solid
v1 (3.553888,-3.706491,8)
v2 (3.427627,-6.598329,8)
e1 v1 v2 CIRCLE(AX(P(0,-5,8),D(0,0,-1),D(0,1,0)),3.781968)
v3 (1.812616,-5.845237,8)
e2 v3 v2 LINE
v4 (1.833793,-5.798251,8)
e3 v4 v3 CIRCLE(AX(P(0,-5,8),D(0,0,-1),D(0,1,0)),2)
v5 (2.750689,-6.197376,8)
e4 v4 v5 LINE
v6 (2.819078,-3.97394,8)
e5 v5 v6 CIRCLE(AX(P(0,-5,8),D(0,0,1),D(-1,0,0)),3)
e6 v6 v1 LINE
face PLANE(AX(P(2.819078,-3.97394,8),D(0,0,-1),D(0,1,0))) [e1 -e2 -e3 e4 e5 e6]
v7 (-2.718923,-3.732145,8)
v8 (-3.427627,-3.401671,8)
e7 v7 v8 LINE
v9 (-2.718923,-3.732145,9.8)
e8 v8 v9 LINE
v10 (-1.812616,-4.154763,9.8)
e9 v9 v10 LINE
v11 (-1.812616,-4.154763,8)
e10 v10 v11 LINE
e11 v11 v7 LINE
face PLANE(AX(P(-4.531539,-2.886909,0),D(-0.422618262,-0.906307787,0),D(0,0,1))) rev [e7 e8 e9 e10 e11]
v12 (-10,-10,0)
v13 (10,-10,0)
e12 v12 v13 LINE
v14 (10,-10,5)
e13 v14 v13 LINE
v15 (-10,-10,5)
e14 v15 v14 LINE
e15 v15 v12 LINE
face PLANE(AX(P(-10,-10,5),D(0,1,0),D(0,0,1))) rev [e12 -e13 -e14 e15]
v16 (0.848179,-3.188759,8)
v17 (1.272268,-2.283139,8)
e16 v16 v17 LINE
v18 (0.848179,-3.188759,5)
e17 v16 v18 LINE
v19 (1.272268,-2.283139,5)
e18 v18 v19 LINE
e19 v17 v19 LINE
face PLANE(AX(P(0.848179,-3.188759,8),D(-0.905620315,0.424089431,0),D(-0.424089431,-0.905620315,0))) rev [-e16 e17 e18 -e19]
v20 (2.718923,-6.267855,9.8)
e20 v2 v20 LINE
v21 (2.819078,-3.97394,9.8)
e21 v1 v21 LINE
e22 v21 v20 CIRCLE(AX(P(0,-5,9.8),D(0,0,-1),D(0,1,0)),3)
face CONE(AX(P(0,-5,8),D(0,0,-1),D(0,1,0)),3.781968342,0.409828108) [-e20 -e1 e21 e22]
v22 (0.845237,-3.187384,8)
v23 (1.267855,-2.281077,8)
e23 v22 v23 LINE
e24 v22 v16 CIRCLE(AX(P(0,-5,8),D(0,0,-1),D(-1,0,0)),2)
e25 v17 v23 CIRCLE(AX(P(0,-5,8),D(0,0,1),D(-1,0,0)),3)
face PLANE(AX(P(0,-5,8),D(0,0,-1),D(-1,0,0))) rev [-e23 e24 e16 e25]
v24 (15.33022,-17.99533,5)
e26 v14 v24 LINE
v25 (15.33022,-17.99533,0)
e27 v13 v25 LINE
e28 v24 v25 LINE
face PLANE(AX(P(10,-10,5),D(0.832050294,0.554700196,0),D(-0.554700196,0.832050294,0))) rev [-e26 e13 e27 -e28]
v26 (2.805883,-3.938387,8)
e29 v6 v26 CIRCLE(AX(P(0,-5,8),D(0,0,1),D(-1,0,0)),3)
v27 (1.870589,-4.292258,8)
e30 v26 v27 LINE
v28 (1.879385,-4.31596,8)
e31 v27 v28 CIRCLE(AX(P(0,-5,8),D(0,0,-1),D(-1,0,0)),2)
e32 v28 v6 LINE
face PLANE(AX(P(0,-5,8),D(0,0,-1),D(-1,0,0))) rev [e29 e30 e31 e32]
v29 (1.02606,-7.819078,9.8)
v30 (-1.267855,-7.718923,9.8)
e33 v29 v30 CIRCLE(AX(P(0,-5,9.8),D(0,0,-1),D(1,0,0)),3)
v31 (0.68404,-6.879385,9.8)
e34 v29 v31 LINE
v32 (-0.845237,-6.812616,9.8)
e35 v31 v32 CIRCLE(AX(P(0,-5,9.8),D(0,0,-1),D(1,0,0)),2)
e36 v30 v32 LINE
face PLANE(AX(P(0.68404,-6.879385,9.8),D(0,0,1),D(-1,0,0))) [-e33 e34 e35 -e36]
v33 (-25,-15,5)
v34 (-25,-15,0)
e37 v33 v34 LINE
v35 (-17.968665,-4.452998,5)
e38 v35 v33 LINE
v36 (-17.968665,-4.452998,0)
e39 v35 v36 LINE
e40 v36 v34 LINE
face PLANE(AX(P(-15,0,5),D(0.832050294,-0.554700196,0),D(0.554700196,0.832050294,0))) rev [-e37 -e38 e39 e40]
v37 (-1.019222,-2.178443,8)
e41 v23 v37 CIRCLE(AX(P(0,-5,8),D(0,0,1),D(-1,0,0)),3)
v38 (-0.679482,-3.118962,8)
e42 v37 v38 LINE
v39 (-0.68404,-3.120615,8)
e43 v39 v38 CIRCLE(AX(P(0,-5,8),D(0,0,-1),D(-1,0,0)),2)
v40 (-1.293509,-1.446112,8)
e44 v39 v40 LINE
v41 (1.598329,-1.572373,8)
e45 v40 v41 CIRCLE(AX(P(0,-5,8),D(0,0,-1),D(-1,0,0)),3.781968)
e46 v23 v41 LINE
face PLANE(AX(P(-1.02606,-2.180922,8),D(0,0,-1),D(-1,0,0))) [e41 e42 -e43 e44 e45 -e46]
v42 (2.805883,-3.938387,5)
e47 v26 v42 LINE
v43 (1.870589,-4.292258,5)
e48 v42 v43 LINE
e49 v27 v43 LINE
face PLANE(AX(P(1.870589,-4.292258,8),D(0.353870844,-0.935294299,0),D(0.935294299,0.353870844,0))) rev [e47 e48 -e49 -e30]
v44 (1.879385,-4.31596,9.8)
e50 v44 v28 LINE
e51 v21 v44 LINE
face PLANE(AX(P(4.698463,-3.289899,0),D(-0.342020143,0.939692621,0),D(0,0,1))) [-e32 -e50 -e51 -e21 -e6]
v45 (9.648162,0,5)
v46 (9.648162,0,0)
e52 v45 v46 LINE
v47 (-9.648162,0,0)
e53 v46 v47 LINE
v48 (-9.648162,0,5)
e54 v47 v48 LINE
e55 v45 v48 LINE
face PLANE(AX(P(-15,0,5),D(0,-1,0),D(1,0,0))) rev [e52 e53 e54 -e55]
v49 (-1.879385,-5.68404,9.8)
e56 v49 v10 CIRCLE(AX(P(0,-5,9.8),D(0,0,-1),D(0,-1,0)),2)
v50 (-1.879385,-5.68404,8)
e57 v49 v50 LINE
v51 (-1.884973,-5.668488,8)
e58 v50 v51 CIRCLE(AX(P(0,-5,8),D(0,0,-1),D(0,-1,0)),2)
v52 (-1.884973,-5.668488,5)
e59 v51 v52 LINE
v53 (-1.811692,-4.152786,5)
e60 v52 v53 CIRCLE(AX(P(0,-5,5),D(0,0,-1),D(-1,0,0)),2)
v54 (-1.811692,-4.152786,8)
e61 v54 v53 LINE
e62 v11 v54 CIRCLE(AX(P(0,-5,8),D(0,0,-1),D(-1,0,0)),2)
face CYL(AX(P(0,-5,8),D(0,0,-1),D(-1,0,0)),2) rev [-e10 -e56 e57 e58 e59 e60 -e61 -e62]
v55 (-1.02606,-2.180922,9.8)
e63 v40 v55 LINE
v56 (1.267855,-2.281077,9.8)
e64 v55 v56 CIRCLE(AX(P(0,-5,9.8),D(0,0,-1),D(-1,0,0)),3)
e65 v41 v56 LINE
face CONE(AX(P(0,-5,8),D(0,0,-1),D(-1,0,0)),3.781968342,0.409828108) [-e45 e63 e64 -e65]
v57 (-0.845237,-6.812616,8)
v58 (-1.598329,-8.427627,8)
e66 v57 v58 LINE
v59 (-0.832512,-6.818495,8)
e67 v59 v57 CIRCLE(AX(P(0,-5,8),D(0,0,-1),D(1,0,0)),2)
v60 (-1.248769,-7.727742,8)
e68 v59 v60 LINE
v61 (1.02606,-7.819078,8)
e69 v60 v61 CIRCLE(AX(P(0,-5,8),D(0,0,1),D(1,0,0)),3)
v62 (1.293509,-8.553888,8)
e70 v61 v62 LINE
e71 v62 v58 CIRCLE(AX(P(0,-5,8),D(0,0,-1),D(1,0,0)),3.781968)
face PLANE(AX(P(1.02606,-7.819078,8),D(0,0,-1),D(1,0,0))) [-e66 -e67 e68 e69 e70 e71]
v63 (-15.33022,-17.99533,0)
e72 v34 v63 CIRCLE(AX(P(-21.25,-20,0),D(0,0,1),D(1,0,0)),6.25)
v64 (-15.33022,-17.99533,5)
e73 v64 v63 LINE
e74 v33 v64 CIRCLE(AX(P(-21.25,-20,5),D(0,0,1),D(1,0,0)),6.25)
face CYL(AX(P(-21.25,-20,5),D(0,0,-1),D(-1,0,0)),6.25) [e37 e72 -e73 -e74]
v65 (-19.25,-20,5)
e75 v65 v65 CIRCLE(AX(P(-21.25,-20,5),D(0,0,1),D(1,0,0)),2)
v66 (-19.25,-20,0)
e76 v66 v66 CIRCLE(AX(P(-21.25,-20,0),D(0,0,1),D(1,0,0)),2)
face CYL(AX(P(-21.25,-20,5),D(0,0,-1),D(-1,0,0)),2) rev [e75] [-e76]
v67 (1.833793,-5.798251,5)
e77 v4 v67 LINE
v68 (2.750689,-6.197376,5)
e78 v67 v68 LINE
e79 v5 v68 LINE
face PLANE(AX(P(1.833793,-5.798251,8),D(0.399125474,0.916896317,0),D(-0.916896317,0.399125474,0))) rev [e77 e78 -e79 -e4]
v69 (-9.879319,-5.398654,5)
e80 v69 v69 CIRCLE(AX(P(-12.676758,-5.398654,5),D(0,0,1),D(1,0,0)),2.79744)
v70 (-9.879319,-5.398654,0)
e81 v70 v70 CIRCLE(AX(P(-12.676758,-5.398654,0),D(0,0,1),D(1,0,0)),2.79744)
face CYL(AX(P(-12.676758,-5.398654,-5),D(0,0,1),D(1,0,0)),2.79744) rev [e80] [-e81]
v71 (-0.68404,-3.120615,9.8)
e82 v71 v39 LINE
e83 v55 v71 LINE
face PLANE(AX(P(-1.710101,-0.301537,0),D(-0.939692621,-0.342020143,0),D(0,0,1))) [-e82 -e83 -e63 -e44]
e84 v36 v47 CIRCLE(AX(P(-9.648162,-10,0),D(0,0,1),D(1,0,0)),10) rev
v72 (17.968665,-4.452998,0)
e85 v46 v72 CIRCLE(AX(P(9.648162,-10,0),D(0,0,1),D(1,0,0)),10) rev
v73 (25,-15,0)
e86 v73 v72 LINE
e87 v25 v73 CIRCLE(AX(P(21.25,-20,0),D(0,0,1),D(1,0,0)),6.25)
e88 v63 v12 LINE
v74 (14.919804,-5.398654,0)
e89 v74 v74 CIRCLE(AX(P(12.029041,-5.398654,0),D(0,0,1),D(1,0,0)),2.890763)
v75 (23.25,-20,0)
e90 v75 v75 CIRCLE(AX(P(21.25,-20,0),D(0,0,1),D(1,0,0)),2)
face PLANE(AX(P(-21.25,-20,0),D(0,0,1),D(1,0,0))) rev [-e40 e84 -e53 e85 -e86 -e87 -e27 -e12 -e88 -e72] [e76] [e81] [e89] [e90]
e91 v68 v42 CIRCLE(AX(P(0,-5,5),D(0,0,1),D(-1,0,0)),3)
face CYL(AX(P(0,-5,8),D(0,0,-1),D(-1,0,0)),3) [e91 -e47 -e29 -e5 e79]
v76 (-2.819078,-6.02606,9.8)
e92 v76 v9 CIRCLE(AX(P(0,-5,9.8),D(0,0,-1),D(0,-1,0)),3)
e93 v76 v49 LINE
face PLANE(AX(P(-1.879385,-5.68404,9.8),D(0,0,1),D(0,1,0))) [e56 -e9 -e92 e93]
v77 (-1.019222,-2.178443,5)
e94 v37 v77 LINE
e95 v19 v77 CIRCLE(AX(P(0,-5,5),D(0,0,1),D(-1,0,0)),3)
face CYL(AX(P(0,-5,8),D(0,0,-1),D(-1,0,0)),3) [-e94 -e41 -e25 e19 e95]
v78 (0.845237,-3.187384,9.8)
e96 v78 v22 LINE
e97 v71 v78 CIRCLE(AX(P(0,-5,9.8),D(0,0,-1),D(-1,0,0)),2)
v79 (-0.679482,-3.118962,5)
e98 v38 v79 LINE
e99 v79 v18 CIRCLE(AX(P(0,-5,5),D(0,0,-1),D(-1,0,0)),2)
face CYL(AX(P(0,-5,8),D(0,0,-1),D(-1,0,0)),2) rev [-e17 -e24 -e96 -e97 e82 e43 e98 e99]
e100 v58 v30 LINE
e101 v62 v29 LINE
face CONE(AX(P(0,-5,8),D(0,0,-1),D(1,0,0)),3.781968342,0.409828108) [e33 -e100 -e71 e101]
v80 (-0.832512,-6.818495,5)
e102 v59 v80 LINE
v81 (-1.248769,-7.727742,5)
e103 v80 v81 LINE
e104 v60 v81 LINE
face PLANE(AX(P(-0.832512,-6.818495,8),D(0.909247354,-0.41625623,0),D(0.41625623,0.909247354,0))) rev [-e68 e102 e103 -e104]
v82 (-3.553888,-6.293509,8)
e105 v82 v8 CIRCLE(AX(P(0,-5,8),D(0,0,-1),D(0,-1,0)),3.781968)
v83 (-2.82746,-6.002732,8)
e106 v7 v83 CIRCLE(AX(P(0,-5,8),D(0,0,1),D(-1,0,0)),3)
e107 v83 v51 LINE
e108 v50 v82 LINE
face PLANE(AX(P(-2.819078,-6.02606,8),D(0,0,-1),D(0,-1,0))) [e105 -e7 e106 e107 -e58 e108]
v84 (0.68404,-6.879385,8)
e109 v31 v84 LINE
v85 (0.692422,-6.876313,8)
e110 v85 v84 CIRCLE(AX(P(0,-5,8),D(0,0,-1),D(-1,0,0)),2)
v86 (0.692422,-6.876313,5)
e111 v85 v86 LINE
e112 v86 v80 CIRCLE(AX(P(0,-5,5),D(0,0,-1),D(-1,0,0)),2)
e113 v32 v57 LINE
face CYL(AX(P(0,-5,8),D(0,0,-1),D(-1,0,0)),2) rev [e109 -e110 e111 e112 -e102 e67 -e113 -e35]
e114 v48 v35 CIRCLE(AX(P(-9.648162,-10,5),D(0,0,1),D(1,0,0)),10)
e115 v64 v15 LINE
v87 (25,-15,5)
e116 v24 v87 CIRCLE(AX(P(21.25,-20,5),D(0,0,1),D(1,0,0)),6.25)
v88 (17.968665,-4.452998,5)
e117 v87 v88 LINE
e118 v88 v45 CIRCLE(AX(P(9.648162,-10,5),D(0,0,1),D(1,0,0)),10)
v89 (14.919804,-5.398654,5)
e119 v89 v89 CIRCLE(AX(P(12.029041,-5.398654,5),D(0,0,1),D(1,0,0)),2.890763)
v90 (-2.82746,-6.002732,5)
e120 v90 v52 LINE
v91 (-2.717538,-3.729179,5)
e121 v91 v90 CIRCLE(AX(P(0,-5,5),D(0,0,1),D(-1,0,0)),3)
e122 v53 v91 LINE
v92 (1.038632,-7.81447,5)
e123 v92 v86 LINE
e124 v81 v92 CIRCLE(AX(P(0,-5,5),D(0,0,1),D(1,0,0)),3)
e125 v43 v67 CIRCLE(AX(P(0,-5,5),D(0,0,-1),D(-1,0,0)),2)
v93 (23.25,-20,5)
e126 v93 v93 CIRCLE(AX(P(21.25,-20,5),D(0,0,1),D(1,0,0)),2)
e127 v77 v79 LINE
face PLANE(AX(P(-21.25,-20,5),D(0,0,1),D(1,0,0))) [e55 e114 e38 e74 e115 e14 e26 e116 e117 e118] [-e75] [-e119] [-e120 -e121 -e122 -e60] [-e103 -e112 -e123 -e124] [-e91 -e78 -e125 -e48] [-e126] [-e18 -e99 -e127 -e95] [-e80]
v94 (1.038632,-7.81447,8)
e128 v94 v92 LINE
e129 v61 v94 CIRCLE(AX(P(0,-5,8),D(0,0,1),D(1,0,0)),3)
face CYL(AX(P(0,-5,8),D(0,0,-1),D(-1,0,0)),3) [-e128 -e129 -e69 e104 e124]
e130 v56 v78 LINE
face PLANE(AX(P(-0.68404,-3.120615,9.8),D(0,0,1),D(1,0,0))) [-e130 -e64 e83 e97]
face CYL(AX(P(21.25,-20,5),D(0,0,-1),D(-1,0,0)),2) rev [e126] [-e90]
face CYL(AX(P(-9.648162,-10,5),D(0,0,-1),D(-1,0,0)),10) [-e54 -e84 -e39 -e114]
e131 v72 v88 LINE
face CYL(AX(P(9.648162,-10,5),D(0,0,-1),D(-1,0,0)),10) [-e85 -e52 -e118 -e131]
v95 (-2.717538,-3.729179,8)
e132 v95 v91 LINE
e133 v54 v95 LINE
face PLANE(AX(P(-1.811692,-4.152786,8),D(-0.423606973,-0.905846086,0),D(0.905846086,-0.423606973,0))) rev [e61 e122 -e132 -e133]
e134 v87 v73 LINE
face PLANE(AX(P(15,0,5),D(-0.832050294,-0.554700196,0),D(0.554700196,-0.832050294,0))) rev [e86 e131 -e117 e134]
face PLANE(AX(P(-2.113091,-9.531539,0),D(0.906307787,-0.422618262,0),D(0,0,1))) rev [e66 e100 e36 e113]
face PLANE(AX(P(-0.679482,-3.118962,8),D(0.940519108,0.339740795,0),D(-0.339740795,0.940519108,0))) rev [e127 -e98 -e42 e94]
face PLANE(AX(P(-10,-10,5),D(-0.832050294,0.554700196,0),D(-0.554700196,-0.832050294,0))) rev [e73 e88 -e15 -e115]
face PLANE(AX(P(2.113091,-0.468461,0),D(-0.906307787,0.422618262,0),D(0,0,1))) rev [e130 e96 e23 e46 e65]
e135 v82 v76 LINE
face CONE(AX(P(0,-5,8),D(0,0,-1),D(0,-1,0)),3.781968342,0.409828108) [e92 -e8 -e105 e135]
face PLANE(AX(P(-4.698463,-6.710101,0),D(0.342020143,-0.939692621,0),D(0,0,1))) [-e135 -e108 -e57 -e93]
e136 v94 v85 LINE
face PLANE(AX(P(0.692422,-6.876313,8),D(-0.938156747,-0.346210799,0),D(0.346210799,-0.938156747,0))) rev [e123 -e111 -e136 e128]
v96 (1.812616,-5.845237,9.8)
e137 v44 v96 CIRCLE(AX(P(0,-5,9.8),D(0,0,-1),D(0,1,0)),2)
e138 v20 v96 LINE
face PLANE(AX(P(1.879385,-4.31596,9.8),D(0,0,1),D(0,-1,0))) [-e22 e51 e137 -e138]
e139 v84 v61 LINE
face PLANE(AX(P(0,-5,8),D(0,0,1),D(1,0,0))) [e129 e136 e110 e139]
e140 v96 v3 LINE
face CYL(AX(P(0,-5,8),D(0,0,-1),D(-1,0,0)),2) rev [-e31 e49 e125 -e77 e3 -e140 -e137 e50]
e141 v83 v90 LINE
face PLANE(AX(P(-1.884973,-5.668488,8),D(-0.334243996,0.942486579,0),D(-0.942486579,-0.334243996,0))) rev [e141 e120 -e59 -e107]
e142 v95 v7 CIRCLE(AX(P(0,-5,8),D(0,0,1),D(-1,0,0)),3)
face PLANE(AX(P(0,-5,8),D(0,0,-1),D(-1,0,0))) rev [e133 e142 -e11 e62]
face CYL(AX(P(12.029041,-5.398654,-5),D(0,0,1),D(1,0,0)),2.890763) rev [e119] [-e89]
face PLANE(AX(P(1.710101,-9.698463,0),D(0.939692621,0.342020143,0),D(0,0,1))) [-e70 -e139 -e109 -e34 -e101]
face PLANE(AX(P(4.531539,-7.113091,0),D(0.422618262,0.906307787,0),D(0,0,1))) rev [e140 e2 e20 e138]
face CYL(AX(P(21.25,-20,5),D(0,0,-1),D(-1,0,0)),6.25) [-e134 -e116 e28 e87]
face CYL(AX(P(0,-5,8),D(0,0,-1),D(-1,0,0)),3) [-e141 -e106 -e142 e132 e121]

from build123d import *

# Parameters (mm, degrees)
SZKIC1_R                    = 2
DODANIE_WYCI_GNI_CIE1_DEPTH = 5
SZKIC2_R                    = 2.797439786
SZKIC2_R_2                  = 2.890763472
WYTNIJ_WYCI_GNI_CIE1_DEPTH  = 10
ZAOKR_GLENIE1_R             = 10
DODANIE_WYCI_GNI_CIE2_DEPTH = 3
OBR_T1_ANGLE                = 45
SZYK_KO_OWY1_COUNT          = 4


# Read off the part's stored shape, not the designer's step: Obrót1
with BuildPart() as part:
    # Szkic1 → Dodanie-wyciągnięcie1 (new body)
    with BuildSketch(Plane.XY):
        with BuildLine():
            Line((-15, 0), (15, 0))
            Line((15, 0), (25, -15))
            ThreePointArc((25, -15), (23.099320571, -25.970135126), (15.330219835, -17.995329753))
            Line((15.330219835, -17.995329753), (10, -10))
            Line((10, -10), (-10, -10))
            Line((-10, -10), (-15.330219835, -17.995329753))
            ThreePointArc((-15.330219835, -17.995329753), (-23.099320571, -25.970135126), (-25, -15))
            Line((-25, -15), (-15, 0))
        make_face()
        with Locations((-21.25, -20)):
            Circle(SZKIC1_R, mode=Mode.SUBTRACT)
        with Locations((21.25, -20)):
            Circle(SZKIC1_R, mode=Mode.SUBTRACT)
    extrude(amount=DODANIE_WYCI_GNI_CIE1_DEPTH)

    # Szkic2 → Wytnij-wyciągnięcie1 (cut)
    with BuildSketch(Plane.XY.offset(5)):
        with Locations((-12.676758493, -5.398654495)):
            Circle(SZKIC2_R)
        with Locations((12.029040905, -5.398654495)):
            Circle(SZKIC2_R_2)
    extrude(amount=-WYTNIJ_WYCI_GNI_CIE1_DEPTH, mode=Mode.SUBTRACT)

    # Zaokrąglenie1
    zaokr_glenie1_edges = [part.edges().sort_by_distance(p)[0] for p in [
        (-15, 0, 2.5),
        (15, 0, 2.5),
    ]]
    fillet(zaokr_glenie1_edges, radius=ZAOKR_GLENIE1_R)

    # Szkic3 → Dodanie-wyciągnięcie2 (add)
    with BuildSketch(Plane.XY.offset(5)):
        with BuildLine():
            Line((-0.67948159, -3.118961784), (-1.019222385, -2.178442676))
            ThreePointArc((-1.019222385, -2.178442676), (0.136924764, -2.003126361), (1.272268294, -2.283139056))
            Line((1.272268294, -2.283139056), (0.848178863, -3.188759371))
            ThreePointArc((0.848178863, -3.188759371), (0.091283176, -3.002084241), (-0.67948159, -3.118961784))
        make_face()
        with BuildLine():
            Line((1.870588598, -4.292258312), (2.805882897, -3.938387468))
            ThreePointArc((2.805882897, -3.938387468), (2.999104941, -5.073277223), (2.750688951, -6.197376422))
            Line((2.750688951, -6.197376422), (1.833792634, -5.798250948))
            ThreePointArc((1.833792634, -5.798250948), (1.999403294, -5.048851482), (1.870588598, -4.292258312))
        make_face()
        with BuildLine():
            Line((0.692421598, -6.876313495), (1.038632398, -7.814470242))
            ThreePointArc((1.038632398, -7.814470242), (-0.113665121, -7.997845933), (-1.248768691, -7.727742062))
            Line((-1.248768691, -7.727742062), (-0.832512461, -6.818494708))
            ThreePointArc((-0.832512461, -6.818494708), (-0.075776747, -6.998563956), (0.692421598, -6.876313495))
        make_face()
        with BuildLine():
            Line((-1.884973157, -5.668487992), (-2.827459736, -6.002731988))
            ThreePointArc((-2.827459736, -6.002731988), (-2.996499858, -4.855125566), (-2.717538259, -3.72917908))
            Line((-2.717538259, -3.72917908), (-1.811692173, -4.152786053))
            ThreePointArc((-1.811692173, -4.152786053), (-1.997666572, -4.903417044), (-1.884973157, -5.668487992))
        make_face()
    extrude(amount=DODANIE_WYCI_GNI_CIE2_DEPTH)

    # Obrót1 outline → Obrót1 (revolve)
    with BuildSketch(Plane(origin=(0, -5, 0), x_dir=(0.42261826174070005, 0.9063077870366497, 0), z_dir=(0.9063077870366497, -0.42261826174070005, 0))):
        Polygon((3, 9.8), (2, 9.8), (2, 8), (3.781968342, 8), align=None)
    obr_t1 = revolve(axis=Axis((0, -5, 0), (0, 0, 1)), revolution_arc=OBR_T1_ANGLE)

    # Szyk kołowy1: Obrót1 ×4 about axis
    szyk_ko_owy1_axis = Axis((0, -5, 5), (0, 0, 1))
    for i in range(1, SZYK_KO_OWY1_COUNT):
        add(obr_t1.rotate(szyk_ko_owy1_axis, i * 360 / SZYK_KO_OWY1_COUNT))


solid = part.part
